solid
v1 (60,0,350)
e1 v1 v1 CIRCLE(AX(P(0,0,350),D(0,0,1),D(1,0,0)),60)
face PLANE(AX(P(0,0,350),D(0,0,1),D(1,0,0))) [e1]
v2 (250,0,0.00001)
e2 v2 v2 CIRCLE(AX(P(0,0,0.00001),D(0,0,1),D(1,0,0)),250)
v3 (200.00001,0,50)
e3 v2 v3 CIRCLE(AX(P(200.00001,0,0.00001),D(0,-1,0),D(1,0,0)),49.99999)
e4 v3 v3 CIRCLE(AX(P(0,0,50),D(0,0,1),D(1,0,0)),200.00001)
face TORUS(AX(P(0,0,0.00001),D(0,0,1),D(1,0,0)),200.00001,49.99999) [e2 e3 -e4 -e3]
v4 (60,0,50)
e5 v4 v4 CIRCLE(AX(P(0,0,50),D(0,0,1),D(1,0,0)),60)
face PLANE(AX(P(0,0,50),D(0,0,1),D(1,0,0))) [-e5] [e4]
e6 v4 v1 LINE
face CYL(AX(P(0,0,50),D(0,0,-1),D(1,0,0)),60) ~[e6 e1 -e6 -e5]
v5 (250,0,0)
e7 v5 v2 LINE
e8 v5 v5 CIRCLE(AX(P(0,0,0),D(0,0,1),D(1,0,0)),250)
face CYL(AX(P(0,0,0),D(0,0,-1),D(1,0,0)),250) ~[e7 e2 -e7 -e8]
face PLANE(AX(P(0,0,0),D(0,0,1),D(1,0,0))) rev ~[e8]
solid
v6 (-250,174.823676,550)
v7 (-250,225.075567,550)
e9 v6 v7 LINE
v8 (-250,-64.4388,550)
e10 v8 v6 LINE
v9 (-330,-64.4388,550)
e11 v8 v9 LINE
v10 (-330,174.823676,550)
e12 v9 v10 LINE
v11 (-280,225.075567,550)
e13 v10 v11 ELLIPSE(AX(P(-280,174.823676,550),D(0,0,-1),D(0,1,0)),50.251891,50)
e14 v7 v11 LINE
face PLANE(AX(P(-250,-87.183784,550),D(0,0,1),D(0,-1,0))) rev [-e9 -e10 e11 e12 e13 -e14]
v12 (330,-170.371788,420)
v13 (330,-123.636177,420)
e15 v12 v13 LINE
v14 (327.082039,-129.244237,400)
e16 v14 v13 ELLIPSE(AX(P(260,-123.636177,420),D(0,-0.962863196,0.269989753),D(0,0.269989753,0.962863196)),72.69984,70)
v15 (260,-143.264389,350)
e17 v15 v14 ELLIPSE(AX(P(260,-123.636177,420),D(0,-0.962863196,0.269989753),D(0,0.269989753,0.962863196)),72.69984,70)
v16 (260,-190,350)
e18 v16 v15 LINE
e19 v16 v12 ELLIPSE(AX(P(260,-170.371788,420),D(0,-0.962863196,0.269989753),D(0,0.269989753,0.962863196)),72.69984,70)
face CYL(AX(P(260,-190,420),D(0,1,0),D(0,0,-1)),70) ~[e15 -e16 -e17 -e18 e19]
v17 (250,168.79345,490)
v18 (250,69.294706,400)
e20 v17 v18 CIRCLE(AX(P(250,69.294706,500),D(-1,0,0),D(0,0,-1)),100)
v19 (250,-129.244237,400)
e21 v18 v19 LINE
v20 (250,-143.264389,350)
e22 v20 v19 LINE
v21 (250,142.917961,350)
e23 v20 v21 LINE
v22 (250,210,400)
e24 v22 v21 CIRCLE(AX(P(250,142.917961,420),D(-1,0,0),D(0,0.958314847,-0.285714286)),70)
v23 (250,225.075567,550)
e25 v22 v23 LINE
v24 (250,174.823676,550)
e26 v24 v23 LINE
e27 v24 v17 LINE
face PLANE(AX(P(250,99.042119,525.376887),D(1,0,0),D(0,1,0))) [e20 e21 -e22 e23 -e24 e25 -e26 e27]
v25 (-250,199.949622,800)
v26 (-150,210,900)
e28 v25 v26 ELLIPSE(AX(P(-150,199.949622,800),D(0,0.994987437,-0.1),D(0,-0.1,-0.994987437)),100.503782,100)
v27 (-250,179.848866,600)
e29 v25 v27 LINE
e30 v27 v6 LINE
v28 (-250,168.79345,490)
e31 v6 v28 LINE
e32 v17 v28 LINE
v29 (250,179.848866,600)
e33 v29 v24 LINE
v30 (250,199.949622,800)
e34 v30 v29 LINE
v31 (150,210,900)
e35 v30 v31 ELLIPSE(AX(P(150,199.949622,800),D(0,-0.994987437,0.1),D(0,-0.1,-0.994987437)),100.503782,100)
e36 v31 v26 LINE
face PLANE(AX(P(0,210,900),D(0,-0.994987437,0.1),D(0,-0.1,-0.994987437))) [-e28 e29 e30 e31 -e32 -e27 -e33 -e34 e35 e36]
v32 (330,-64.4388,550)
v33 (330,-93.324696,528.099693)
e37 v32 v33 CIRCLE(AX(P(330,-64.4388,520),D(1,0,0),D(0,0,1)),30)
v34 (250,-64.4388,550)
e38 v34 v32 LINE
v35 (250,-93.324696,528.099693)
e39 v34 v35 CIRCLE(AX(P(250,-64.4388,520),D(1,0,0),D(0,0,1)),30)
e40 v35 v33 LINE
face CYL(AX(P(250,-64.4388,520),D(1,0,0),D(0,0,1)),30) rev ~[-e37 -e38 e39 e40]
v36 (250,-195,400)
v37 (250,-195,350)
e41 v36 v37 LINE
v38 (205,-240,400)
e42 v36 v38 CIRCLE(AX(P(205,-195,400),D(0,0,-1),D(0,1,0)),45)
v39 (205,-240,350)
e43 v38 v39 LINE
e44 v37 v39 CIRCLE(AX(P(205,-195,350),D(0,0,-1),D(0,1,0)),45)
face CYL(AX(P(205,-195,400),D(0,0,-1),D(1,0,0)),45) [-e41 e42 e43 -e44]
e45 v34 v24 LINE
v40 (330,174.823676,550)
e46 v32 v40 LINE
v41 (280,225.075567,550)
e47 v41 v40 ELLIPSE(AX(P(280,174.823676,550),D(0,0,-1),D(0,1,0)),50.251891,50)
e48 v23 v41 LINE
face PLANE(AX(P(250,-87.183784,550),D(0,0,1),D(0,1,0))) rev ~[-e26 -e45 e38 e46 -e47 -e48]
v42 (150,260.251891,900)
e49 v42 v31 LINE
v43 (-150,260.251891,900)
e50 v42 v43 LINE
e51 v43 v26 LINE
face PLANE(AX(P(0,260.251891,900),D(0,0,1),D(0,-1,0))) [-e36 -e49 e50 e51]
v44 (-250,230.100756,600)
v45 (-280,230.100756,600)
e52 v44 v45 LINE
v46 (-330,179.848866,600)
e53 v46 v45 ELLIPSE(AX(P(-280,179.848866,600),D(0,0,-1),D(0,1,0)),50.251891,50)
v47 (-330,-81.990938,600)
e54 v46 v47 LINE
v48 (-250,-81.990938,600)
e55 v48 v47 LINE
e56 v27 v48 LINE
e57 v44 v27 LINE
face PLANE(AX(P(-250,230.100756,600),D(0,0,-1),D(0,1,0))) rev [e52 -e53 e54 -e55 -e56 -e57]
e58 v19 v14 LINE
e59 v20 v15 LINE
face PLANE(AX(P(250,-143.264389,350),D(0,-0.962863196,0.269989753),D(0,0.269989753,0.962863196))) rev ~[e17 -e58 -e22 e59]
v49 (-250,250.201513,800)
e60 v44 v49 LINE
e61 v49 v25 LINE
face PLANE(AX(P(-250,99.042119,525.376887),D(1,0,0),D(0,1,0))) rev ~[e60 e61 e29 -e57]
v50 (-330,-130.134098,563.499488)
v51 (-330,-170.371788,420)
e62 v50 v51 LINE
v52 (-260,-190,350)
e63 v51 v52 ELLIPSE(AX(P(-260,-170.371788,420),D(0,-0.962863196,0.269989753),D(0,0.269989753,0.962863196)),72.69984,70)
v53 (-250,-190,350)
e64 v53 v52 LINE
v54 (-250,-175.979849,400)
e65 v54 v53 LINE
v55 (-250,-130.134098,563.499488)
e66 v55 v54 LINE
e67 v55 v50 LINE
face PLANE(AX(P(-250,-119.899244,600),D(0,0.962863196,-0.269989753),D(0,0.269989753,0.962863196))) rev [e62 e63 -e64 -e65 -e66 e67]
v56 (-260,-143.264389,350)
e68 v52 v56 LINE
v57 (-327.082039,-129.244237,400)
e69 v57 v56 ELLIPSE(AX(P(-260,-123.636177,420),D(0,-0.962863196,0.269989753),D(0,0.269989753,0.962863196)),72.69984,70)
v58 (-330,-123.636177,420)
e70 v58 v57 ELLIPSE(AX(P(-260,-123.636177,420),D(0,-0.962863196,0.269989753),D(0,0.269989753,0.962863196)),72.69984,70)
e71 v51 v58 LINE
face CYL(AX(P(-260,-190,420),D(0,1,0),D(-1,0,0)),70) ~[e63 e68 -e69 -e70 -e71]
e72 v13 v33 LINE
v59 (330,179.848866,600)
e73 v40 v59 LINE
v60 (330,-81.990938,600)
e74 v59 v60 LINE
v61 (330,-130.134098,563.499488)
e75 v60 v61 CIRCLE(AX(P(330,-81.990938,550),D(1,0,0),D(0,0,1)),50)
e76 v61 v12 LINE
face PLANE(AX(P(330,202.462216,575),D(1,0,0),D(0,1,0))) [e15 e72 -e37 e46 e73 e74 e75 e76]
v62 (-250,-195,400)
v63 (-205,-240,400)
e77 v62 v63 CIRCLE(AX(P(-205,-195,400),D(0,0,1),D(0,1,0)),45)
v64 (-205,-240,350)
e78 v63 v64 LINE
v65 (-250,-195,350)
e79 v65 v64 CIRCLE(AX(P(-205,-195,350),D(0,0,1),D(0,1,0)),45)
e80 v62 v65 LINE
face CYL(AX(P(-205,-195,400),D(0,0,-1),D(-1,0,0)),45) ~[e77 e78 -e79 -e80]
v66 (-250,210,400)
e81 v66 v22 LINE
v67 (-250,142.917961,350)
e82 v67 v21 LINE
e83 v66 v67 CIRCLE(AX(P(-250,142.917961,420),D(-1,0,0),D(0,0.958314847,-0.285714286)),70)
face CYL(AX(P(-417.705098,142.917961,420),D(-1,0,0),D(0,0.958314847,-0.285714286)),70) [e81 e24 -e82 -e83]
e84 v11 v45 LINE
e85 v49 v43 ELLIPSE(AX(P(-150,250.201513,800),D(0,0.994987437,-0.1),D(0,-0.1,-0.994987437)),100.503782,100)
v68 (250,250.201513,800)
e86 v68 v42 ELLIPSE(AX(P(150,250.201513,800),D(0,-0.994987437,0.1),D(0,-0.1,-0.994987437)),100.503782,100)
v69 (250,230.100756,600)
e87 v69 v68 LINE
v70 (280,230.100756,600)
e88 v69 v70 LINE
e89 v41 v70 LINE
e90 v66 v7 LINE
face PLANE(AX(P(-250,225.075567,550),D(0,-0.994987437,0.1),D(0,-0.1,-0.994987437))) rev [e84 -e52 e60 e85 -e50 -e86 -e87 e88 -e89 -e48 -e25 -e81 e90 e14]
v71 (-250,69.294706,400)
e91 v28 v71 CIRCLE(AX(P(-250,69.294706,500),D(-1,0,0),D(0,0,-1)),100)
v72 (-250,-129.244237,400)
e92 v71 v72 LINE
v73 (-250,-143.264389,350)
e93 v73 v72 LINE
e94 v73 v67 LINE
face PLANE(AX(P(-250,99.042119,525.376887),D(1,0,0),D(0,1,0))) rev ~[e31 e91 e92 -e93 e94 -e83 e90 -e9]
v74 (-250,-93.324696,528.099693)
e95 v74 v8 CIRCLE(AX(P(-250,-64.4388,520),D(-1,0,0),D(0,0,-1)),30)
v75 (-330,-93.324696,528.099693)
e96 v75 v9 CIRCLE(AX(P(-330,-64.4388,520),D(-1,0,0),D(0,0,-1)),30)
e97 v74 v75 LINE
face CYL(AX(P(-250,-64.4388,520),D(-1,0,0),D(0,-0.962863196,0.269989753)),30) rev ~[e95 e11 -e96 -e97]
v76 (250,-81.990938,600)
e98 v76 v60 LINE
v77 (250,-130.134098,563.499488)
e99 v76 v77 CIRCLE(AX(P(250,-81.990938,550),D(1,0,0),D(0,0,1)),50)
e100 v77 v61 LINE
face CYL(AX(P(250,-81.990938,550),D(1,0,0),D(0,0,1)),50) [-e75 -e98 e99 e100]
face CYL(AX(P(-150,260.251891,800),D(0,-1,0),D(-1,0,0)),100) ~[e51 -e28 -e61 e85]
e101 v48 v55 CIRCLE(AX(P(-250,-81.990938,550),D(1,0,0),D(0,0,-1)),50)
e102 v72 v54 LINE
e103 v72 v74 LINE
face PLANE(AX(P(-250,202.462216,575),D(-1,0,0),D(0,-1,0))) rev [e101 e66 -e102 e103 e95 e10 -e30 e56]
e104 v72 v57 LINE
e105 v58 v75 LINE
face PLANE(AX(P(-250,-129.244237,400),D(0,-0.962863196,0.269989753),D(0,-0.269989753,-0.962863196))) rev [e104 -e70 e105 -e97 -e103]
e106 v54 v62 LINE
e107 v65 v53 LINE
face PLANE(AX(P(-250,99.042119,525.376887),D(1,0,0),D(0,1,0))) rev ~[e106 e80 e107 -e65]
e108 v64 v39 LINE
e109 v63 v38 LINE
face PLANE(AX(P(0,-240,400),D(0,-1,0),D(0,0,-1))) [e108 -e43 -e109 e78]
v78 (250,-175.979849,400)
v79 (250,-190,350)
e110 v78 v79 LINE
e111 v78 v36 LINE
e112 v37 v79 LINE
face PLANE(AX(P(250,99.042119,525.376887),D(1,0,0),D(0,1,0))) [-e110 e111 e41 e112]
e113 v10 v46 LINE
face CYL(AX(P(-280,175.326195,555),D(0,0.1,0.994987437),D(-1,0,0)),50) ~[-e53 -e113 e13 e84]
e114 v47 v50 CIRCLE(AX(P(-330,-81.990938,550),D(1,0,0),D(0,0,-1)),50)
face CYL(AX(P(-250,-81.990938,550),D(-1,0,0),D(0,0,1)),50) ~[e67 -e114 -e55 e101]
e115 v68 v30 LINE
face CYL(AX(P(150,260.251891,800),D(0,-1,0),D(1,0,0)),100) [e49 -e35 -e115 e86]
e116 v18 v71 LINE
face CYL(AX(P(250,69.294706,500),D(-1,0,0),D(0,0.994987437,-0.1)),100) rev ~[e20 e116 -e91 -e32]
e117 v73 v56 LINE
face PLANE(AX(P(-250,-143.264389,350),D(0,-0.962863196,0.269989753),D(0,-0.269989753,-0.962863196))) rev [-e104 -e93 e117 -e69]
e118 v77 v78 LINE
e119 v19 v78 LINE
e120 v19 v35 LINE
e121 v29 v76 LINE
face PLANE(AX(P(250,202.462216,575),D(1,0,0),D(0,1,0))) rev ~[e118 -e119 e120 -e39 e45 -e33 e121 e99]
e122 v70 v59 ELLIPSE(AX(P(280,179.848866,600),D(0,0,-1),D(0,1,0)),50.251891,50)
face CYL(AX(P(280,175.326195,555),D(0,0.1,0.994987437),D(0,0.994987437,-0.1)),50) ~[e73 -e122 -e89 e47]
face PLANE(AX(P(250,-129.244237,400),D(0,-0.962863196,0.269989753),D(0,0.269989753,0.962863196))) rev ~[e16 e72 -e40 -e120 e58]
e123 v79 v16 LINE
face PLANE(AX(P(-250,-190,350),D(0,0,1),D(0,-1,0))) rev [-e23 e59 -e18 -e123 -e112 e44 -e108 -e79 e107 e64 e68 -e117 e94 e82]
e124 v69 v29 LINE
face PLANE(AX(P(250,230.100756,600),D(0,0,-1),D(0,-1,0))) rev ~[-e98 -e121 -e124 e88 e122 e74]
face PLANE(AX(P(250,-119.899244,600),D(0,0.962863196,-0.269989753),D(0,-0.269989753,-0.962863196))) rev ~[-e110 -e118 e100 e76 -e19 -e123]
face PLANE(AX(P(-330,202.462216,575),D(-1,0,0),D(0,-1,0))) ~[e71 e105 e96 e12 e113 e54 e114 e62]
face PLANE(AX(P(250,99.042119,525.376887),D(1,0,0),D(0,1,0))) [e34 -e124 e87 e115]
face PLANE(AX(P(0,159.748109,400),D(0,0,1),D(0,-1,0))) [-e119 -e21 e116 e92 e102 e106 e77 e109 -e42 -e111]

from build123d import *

# Parameters (mm, degrees)
F0_R         = 250
F1_DEPTH     = 50
F2_R         = 60
F3_DEPTH     = 300
F5_DEPTH     = 250
F7_DEPTH     = 80
F9_R         = 45
F10_R        = 100
F11_R        = 100
F12_T1_DEPTH = 835.410196625
F13_R        = 50
F14_R        = 30
F15_R        = 70
F16_R        = 50
F17_R        = 49.99999


# Not quite as in the source:
# - a fillet or chamfer that OpenCascade refuses, or shapes differently, is made with other operations: its cross-section is extruded or revolved along the edge and cut away or added
# - a fillet or chamfer is up to 0.001 mm smaller than in the source, because OpenCascade refuses the exact size


with BuildPart() as f1:
    # F0 (on Top) → F1 (new body)
    with BuildSketch(Plane.XY):
        Circle(F0_R)
    extrude(amount=F1_DEPTH)

    # F2 (on face) → F3 (join)
    with BuildSketch(Plane.XY.offset(50)):
        Circle(F2_R)
    extrude(amount=F3_DEPTH)

    # F17 (radius 50 in the source; OpenCascade refuses exactly that, so slightly less here)
    f17_edges = [f1.edges().sort_by_distance(p)[0] for p in [
        (-250, 0, 50),
    ]]
    fillet(f17_edges, radius=F17_R)


with BuildPart() as f5:
    # F4 (on Right) → F5 (new body, symmetric)
    with BuildSketch(Plane.YZ):
        Polygon((159.748109237, 400), (-240, 400), (-240, 350), (210, 350), (210, 400), (260.251890763, 900), (210, 900), align=None)
    extrude(amount=F5_DEPTH, both=True)

    # F6 (on face) → F7 (join)
    with BuildSketch(Plane.YZ.offset(250)):
        Polygon((225.0755672289, 550), (230.1007563052, 600), (179.8488655422, 600), (174.8236764659, 550), align=None)
        Polygon((-129.2442374825, 400), (-175.979848739, 400), (-190, 350), (-143.2643887435, 350), align=None)
        Polygon((174.8236764659, 550), (179.8488655422, 600), (-119.8992436948, 600), (-175.979848739, 400), (-129.2442374825, 400), (-87.1837836993, 550), align=None)
    extrude(amount=F7_DEPTH)

    # F8: F5 across plane


with BuildPart() as f5_1:
    add(f5.part)
    add(f5.part.mirror(Plane.YZ))

    # F9
    f9_edges = [f5_1.edges().sort_by_distance(p)[0] for p in [
        (250, -240, 375),
        (-250, -240, 375),
    ]]
    fillet(f9_edges, radius=F9_R)

    # F10
    f10_edges = [f5_1.edges().sort_by_distance(p)[0] for p in [
        (250, 235.125945, 900),
        (-250, 235.125945, 900),
    ]]
    fillet(f10_edges, radius=F10_R)

    # F11
    f11_edges = [f5_1.edges().sort_by_distance(p)[0] for p in [
        (0, 159.748109, 400),
    ]]
    fillet(f11_edges, radius=F11_R)

    # F12: fillet of radius 70 on 1 edges, made by hand

    # F12_s2 → F12_t1 (cut)
    with BuildSketch(Plane.YZ.offset(-417.7050983125)):
        with BuildLine():
            ThreePointArc((210, 400), (184.7509620017, 363.8751391984), (142.917960675, 350))
            Line((142.917960675, 350), (210, 350))
            Line((210, 350), (210, 400))
        make_face()
    extrude(amount=F12_T1_DEPTH, mode=Mode.SUBTRACT)

    # F13
    f13_edges = [f5_1.edges().sort_by_distance(p)[0] for p in [
        (290, -119.899244, 600),
        (-290, -119.899244, 600),
    ]]
    fillet(f13_edges, radius=F13_R)

    # F14
    f14_edges = [f5_1.edges().sort_by_distance(p)[0] for p in [
        (290, -87.183784, 550),
        (-290, -87.183784, 550),
    ]]
    fillet(f14_edges, radius=F14_R)

    # F15
    f15_edges = [f5_1.edges().sort_by_distance(p)[0] for p in [
        (330, -166.632194, 350),
        (-330, -166.632194, 350),
    ]]
    fillet(f15_edges, radius=F15_R)

    # F16
    f16_edges = [f5_1.edges().sort_by_distance(p)[0] for p in [
        (330, 227.588162, 575),
        (-330, 227.588162, 575),
    ]]
    fillet(f16_edges, radius=F16_R)


solid = Compound([f1.part, f5_1.part])
